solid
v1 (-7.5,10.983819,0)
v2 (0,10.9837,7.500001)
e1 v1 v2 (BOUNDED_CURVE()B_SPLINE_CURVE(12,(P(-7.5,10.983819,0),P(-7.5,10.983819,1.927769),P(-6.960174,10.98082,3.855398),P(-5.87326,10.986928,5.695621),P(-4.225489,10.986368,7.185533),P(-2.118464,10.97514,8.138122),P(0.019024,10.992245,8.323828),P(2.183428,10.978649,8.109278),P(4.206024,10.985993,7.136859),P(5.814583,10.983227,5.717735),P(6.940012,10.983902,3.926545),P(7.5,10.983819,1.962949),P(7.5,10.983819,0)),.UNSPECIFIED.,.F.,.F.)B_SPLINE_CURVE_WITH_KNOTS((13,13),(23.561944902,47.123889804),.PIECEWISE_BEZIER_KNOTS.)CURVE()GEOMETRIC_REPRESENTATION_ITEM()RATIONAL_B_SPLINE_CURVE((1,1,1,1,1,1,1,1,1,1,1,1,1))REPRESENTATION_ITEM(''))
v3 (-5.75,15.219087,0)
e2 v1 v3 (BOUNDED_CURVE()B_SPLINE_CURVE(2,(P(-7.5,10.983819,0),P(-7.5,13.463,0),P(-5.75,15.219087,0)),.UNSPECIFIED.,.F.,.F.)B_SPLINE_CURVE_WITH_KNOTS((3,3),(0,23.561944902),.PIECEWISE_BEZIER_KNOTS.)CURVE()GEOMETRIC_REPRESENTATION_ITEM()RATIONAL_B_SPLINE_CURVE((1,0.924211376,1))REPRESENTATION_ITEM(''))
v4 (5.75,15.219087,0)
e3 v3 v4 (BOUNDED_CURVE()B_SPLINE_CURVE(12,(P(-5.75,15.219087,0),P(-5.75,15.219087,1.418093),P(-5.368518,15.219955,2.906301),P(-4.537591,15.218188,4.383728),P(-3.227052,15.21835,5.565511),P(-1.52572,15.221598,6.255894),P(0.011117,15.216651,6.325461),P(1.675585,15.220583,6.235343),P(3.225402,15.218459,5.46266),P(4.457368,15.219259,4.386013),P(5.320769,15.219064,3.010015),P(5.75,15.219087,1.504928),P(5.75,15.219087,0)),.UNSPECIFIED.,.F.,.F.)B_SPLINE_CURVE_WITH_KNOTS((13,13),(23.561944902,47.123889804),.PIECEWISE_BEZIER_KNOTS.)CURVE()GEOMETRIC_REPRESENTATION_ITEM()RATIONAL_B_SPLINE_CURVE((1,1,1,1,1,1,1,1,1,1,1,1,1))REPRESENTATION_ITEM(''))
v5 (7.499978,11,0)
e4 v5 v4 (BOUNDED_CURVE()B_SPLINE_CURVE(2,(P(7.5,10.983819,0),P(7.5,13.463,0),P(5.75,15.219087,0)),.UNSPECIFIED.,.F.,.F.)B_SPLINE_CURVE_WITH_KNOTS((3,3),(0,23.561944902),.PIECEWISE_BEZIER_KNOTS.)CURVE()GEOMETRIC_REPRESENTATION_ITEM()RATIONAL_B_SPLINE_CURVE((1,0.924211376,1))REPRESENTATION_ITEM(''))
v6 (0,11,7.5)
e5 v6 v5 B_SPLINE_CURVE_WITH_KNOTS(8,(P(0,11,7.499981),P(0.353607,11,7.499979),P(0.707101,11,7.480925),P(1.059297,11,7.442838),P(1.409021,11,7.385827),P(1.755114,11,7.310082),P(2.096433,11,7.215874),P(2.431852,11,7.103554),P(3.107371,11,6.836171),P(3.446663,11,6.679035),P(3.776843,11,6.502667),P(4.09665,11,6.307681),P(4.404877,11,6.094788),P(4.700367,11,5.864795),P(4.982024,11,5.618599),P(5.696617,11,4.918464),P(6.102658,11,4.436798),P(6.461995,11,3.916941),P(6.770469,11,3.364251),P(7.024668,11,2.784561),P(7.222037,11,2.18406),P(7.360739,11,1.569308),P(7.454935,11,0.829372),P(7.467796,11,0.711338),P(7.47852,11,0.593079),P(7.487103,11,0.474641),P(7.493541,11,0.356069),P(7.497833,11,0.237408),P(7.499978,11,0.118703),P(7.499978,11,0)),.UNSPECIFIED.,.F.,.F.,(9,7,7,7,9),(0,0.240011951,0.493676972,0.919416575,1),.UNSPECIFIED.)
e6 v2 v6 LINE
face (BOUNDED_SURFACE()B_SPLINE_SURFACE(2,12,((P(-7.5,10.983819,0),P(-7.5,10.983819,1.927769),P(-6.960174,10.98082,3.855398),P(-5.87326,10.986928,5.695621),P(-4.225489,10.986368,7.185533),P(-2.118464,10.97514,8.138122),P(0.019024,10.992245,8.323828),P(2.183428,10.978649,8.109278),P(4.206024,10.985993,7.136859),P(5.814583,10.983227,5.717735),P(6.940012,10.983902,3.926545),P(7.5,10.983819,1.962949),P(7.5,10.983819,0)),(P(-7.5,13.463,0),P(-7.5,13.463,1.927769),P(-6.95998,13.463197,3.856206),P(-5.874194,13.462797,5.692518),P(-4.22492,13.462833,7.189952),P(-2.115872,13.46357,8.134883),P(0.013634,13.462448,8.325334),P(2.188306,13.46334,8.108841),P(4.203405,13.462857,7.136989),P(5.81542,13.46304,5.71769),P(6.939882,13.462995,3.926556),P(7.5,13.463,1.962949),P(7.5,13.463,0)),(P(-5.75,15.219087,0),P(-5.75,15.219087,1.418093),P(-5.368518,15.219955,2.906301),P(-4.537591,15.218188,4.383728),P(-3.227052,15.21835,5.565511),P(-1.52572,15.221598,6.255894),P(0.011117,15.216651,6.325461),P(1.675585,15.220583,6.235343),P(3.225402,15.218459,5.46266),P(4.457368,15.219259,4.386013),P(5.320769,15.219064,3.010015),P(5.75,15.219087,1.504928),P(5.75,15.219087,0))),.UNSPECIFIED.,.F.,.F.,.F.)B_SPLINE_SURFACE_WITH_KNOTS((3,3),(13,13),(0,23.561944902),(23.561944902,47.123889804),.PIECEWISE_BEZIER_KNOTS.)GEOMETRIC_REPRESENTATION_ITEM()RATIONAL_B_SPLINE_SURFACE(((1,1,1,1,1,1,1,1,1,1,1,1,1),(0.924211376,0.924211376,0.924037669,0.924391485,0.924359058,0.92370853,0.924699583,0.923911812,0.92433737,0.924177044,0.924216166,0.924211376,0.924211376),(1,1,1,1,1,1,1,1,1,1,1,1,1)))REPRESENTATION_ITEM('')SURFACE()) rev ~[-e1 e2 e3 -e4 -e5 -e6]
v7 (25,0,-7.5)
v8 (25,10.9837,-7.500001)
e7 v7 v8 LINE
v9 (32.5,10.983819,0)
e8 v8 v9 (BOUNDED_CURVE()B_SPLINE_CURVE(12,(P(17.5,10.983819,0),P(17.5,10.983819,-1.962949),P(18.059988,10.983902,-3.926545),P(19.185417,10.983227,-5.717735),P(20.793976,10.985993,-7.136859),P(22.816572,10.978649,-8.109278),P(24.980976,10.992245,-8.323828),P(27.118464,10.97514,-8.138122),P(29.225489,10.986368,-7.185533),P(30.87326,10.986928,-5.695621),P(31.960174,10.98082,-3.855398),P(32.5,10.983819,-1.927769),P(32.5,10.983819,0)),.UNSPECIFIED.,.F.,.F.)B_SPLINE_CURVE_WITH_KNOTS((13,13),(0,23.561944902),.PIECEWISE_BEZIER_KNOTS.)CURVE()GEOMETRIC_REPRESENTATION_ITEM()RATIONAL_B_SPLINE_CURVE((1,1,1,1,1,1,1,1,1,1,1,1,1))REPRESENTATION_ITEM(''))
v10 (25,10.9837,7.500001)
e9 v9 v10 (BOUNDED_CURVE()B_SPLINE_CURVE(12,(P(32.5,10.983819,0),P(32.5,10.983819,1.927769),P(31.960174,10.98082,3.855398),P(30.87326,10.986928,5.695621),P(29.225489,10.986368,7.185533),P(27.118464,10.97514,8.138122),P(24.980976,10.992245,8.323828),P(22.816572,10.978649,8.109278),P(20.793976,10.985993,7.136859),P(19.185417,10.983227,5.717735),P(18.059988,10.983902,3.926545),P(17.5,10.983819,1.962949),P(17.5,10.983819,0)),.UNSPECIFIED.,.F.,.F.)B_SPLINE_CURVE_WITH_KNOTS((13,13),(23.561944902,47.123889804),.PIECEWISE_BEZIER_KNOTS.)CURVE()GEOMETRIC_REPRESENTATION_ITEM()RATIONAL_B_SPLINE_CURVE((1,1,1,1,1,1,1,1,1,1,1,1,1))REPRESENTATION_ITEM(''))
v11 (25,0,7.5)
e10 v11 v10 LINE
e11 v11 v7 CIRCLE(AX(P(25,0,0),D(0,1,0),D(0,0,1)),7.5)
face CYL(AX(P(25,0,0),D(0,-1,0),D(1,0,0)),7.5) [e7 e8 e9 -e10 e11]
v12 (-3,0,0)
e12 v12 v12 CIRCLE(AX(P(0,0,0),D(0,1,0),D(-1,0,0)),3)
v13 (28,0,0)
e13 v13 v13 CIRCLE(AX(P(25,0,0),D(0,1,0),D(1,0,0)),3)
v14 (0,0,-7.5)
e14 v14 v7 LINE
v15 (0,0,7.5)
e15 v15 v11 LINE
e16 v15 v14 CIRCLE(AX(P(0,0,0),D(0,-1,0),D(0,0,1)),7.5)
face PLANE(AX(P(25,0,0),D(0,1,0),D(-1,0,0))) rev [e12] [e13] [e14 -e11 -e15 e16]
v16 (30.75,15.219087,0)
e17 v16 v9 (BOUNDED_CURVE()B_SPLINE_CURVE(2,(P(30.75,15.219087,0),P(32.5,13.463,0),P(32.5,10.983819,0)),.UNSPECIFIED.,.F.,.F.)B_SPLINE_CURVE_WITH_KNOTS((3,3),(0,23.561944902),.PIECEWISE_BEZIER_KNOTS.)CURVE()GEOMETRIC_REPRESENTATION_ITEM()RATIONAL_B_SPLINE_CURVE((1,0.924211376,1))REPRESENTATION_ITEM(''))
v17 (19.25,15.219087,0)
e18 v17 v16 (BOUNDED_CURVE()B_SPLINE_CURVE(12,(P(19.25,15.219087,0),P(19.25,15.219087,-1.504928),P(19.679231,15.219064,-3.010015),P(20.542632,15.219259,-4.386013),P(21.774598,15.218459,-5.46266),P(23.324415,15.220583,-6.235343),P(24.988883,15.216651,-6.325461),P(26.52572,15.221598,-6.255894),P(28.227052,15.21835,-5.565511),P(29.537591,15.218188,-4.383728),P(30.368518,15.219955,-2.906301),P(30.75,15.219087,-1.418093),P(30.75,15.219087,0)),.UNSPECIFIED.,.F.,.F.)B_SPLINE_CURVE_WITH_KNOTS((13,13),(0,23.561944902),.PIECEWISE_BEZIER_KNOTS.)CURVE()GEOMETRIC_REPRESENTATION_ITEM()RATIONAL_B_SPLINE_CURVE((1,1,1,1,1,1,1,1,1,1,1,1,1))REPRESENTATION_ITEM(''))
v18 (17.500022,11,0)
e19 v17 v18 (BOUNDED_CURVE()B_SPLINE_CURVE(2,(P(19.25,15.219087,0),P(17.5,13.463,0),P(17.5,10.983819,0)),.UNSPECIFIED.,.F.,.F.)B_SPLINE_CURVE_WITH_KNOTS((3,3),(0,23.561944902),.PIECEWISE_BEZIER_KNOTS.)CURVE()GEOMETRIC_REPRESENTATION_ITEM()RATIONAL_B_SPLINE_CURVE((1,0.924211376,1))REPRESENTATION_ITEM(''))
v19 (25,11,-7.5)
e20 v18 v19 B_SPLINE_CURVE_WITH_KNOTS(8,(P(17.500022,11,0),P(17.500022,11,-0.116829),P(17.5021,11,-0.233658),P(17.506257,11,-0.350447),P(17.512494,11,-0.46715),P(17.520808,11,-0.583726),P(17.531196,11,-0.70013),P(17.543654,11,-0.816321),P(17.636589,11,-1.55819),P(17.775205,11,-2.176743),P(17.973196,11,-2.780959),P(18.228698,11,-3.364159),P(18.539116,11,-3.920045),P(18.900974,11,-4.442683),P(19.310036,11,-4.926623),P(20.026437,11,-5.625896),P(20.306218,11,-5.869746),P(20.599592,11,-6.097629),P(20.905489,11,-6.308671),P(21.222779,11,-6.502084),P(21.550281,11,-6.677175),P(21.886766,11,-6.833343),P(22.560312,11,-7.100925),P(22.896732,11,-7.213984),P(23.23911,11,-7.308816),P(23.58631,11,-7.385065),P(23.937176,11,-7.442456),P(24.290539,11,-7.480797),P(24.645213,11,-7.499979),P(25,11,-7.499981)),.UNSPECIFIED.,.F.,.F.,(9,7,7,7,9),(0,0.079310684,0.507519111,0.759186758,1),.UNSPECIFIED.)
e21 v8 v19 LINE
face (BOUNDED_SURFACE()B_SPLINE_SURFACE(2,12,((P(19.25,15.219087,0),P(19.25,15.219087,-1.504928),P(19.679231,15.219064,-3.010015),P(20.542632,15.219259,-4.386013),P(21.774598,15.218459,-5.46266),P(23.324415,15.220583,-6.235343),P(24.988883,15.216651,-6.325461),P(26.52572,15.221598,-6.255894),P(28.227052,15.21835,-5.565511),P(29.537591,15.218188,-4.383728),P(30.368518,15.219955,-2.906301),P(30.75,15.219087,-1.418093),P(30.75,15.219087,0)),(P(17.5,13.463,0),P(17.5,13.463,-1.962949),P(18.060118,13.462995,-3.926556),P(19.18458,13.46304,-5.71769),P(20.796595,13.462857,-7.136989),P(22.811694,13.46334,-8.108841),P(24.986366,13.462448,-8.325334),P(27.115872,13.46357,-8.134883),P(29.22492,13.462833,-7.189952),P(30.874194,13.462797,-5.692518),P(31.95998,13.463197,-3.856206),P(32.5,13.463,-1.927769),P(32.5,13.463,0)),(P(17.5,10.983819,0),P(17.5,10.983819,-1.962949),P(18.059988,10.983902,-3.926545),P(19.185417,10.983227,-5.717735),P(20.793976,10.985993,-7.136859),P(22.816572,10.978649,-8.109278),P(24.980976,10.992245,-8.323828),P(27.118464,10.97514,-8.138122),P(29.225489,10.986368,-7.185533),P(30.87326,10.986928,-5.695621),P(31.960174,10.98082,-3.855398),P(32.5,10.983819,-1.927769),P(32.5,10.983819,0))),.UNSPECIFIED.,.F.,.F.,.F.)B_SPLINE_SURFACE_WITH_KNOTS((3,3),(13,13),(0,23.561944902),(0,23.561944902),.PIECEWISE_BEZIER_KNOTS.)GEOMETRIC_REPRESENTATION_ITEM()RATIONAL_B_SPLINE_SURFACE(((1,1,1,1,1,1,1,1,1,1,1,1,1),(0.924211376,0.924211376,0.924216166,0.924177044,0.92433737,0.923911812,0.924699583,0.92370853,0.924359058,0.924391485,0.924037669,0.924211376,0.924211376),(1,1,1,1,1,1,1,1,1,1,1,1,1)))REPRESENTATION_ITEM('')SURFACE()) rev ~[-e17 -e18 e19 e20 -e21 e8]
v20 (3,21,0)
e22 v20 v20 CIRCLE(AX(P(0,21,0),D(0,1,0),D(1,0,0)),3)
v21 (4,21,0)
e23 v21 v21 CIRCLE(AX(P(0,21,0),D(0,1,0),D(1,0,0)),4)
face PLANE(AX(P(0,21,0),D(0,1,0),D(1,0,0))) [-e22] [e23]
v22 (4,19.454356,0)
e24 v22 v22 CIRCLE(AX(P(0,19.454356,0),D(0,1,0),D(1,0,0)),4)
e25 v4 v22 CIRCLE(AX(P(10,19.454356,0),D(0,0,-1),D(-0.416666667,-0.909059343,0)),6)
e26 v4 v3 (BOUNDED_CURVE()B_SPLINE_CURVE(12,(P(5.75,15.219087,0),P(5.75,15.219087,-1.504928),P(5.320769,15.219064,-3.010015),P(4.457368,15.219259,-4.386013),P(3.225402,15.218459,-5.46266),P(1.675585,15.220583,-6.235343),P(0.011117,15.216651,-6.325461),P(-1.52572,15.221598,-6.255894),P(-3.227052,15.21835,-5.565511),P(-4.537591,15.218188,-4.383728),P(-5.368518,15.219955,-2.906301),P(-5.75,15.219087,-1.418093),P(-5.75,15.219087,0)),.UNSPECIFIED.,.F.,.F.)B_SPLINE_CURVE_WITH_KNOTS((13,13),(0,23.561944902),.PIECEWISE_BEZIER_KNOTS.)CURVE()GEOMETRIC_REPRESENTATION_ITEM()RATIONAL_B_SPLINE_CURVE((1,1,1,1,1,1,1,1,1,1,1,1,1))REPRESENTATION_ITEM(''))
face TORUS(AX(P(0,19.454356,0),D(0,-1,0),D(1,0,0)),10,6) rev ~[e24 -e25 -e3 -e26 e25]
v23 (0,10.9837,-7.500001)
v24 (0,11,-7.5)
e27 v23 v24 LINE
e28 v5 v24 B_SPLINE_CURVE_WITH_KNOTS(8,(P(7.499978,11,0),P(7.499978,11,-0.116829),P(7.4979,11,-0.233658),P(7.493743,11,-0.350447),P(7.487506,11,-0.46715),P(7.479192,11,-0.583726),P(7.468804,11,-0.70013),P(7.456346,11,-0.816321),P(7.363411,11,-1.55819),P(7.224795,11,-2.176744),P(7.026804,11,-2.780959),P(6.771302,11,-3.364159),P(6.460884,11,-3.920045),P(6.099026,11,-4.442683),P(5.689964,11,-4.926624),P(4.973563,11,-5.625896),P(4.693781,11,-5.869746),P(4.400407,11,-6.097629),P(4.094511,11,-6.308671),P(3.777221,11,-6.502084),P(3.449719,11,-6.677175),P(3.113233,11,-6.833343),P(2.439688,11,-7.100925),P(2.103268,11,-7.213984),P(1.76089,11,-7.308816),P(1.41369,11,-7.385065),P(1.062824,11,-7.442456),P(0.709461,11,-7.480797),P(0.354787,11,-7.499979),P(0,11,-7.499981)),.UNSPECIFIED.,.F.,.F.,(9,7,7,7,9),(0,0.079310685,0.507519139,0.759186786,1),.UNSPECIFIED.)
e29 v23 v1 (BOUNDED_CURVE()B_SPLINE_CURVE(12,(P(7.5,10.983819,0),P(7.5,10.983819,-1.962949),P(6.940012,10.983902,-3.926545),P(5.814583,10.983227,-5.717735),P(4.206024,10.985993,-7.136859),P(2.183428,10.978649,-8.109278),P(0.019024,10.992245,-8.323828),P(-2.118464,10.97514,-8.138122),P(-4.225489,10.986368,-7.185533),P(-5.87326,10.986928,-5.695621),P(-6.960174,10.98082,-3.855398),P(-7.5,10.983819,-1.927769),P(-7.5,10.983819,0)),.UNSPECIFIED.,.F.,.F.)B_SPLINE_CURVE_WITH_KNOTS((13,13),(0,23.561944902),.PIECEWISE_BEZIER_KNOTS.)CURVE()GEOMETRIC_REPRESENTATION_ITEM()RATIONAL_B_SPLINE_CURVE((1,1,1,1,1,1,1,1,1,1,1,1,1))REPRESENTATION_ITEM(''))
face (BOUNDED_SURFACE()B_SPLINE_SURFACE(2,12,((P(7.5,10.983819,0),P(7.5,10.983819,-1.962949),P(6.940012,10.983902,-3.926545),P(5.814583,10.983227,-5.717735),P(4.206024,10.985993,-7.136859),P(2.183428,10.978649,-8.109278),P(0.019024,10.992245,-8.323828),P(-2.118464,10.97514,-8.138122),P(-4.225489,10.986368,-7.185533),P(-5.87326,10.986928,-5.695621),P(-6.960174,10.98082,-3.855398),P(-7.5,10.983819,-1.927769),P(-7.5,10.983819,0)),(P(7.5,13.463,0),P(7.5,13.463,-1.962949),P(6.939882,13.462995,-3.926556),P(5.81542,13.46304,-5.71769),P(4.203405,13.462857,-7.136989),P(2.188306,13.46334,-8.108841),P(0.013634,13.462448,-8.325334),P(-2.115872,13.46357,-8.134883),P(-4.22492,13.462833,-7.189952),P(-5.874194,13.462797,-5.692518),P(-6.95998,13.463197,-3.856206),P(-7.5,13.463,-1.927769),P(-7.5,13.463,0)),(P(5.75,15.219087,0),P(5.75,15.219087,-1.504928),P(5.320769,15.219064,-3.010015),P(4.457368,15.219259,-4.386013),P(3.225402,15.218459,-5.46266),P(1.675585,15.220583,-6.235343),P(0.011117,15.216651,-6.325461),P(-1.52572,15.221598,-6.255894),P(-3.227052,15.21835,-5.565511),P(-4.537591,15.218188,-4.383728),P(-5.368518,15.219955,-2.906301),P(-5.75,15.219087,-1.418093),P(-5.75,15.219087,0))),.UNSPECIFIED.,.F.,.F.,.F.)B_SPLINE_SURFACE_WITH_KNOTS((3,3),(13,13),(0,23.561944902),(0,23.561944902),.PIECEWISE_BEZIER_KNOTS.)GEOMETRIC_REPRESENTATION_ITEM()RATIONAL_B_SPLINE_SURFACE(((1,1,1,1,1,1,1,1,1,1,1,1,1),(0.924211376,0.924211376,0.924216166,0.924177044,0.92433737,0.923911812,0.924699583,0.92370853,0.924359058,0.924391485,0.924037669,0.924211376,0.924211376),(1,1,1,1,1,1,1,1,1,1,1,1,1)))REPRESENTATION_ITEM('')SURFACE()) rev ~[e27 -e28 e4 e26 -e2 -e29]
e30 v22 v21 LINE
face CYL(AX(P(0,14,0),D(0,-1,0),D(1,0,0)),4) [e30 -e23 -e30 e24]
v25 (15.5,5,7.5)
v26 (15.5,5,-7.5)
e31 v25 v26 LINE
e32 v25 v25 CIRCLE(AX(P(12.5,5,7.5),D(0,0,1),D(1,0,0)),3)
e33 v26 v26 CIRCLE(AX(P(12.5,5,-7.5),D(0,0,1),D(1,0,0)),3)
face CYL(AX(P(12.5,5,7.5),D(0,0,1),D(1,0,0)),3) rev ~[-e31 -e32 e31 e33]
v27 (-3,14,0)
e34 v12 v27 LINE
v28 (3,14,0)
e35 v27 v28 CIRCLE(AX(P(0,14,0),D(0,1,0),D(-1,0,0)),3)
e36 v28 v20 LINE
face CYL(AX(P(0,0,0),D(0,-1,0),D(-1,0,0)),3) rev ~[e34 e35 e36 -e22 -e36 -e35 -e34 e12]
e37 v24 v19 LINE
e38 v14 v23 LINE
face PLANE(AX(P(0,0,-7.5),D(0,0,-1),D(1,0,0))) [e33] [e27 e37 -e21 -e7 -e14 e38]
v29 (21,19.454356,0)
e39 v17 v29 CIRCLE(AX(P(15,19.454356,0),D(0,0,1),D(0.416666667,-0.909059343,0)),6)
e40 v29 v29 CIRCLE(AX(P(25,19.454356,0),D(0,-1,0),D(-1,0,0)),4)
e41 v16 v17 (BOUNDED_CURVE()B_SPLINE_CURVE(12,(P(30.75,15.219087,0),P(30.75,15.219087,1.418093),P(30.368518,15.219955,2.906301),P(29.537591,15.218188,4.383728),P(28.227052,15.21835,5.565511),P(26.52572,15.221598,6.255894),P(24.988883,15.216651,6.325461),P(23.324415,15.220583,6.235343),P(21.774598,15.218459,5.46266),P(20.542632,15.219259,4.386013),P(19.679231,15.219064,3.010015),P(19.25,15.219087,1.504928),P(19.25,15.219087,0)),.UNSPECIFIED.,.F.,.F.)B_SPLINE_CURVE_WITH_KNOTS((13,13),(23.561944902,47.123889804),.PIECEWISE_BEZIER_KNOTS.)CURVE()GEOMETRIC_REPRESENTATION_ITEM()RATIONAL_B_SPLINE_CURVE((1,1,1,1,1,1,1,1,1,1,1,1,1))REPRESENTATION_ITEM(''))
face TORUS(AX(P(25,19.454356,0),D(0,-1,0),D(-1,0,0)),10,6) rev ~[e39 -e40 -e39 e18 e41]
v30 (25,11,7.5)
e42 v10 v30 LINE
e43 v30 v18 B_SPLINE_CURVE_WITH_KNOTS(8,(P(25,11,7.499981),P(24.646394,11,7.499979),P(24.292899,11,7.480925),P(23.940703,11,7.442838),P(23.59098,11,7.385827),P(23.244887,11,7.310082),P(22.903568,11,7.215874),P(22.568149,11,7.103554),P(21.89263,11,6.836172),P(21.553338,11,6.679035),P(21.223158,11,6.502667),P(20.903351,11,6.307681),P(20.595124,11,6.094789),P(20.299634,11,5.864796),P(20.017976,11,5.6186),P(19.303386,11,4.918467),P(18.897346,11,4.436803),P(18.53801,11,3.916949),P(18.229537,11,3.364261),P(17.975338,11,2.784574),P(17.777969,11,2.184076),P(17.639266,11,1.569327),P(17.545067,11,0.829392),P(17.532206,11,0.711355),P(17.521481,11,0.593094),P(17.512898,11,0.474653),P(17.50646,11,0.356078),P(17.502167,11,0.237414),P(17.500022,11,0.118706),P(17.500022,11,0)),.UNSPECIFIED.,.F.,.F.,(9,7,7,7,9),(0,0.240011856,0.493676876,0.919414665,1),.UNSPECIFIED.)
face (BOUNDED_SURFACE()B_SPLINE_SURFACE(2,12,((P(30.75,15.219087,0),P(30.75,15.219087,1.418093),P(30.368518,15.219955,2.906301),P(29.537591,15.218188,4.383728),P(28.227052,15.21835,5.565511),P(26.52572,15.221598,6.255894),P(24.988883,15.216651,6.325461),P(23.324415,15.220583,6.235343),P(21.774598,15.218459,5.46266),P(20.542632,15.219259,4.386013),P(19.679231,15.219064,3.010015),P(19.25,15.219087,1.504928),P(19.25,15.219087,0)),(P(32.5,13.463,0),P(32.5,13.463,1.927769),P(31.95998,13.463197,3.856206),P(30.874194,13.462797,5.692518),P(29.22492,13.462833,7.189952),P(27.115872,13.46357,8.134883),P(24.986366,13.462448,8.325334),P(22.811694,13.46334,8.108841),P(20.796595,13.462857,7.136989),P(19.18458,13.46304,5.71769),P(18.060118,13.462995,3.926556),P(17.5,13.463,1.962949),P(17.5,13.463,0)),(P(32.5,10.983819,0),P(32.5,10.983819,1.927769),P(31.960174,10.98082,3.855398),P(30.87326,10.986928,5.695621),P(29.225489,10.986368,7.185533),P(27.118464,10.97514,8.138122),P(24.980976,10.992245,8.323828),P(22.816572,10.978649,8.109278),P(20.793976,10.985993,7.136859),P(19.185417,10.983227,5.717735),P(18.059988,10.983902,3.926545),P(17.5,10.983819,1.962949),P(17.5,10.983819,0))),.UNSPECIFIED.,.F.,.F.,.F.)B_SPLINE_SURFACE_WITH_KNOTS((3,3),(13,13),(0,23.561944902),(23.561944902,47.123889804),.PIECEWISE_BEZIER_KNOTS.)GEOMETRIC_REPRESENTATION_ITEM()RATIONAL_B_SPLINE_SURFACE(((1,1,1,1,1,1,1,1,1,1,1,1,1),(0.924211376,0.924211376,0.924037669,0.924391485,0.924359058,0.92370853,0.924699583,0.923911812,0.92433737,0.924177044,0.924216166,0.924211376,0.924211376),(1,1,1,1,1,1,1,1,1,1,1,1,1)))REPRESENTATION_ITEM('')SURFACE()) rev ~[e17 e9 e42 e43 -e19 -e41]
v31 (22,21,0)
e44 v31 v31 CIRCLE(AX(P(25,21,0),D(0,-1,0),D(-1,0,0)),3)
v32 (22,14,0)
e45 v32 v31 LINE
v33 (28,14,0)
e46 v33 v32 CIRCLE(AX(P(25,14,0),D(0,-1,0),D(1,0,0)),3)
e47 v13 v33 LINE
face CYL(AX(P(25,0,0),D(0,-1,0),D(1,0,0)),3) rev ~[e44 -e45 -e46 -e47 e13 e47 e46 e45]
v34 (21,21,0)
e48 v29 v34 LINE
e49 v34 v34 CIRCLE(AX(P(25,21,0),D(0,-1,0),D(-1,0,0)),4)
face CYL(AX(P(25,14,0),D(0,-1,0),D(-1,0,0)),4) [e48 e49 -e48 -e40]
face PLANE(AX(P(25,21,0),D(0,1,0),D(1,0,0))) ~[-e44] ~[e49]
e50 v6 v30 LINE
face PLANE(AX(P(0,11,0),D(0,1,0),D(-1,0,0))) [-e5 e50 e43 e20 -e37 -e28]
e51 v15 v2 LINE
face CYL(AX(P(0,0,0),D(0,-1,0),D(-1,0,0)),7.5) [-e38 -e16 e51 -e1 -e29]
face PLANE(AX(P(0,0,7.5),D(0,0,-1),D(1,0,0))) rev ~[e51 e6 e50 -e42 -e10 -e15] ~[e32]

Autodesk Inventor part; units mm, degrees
ref_plane "XZ Plane" through (0, 0, 0) normal (0, 1, 0) x (-1, 0, 0)
ref_plane "XY Plane" through (0, 0, 0) normal (0, 0, 1) x (1, 0, 0)
sketch "Sketch1" plane through (0, 0, 0) normal (0, 1, 0) x (-1, 0, 0)
  circle A0 centre (0, 0) radius 7.5
  circle A1 centre (0, 0) radius 3
  dimension "d0" = 15
  dimension "d1" = 6
extrude "Extrusion1" add sketch "Sketch1" along normal blind 14
sketch "Sketch2" plane through (0, 14, 0) normal (0, 1, 0) x (1, 0, 0)
  circle A0 centre (0, 0) radius 3 projected
  circle A1 centre (0, 0) radius 2.75
  circle A2 centre (0, 0) radius 4
  dimension "d4" = 5.5
  dimension "d5" = 8
extrude "Extrusion2" add sketch "Sketch2" along normal blind 7 contours A2
fillet "Fillet1" radius 6 1 edges at (-4, 14, 0)
fillet "Fillet2" radius 6 2 edges at (0, 14, -7.5) (0, 14, 7.5)
ref_plane "Work Plane1" through (12.5, 0, 0) normal (1, 0, 0) x (0, 1, 0)
mirror "Mirror1" about plane through (12.5, 0, 0) normal (1, 0, 0) of "Extrusion1", "Extrusion2", "Fillet1", "Fillet2"
sketch "Sketch3" plane through (0, 0, 0) normal (0, 1, 0) x (-1, 0, 0)
  circle A0 centre (-25, 0) radius 3 projected
  line L0 (-25, 0) -> (-25, 3)
  line L1 (-25, 0) -> (-25, -3)
  line L2 (0, 0) -> (0, -3)
  circle A1 centre (0, 0) radius 3 projected
  line L3 (0, 0) -> (0, 3)
  line L4 (-25, 3) -> (0, 3)
  line L5 (0, 3) -> (0, 7.5)
  line L6 (0, 7.5) -> (-25, 7.5)
  line L7 (-25, 7.5) -> (-25, 3)
  line L8 (-25, -3) -> (0, -3)
  line L9 (0, -3) -> (0, -7.5)
  line L10 (0, -7.5) -> (-25, -7.5)
  line L11 (-25, -7.5) -> (-25, -3)
  point P0 (0, -3)
  point P1 (0, 3)
  dimension "d11" = 25
  dimension "d12" = 4.5
  dimension "d13" = 25
  dimension "d14" = 4.5
extrude "Extrusion3" add sketch "Sketch3" along normal blind 11 contours A0 L4 A1 L8 | L7 L6 L5 L4 | L8 L9 L10 L11
sketch "Sketch4" plane through (0, 0, 7.5) normal (0, 0, 1) x (1, 0, 0)
  line L0 (25, 11) -> (0, 11) projected
  circle A0 centre (12.5, 5) radius 3
  line L1 (0, 0) -> (25, 0) projected
  line L2 (0, 0) -> (0, 10.9838) projected
  dimension "d18" = 6
  dimension "d21" = 5
  dimension "d22" = 12.5
extrude "Extrusion4" cut sketch "Sketch4" against normal through all
properties part number "4mm_Roller_Spacer_simple"
